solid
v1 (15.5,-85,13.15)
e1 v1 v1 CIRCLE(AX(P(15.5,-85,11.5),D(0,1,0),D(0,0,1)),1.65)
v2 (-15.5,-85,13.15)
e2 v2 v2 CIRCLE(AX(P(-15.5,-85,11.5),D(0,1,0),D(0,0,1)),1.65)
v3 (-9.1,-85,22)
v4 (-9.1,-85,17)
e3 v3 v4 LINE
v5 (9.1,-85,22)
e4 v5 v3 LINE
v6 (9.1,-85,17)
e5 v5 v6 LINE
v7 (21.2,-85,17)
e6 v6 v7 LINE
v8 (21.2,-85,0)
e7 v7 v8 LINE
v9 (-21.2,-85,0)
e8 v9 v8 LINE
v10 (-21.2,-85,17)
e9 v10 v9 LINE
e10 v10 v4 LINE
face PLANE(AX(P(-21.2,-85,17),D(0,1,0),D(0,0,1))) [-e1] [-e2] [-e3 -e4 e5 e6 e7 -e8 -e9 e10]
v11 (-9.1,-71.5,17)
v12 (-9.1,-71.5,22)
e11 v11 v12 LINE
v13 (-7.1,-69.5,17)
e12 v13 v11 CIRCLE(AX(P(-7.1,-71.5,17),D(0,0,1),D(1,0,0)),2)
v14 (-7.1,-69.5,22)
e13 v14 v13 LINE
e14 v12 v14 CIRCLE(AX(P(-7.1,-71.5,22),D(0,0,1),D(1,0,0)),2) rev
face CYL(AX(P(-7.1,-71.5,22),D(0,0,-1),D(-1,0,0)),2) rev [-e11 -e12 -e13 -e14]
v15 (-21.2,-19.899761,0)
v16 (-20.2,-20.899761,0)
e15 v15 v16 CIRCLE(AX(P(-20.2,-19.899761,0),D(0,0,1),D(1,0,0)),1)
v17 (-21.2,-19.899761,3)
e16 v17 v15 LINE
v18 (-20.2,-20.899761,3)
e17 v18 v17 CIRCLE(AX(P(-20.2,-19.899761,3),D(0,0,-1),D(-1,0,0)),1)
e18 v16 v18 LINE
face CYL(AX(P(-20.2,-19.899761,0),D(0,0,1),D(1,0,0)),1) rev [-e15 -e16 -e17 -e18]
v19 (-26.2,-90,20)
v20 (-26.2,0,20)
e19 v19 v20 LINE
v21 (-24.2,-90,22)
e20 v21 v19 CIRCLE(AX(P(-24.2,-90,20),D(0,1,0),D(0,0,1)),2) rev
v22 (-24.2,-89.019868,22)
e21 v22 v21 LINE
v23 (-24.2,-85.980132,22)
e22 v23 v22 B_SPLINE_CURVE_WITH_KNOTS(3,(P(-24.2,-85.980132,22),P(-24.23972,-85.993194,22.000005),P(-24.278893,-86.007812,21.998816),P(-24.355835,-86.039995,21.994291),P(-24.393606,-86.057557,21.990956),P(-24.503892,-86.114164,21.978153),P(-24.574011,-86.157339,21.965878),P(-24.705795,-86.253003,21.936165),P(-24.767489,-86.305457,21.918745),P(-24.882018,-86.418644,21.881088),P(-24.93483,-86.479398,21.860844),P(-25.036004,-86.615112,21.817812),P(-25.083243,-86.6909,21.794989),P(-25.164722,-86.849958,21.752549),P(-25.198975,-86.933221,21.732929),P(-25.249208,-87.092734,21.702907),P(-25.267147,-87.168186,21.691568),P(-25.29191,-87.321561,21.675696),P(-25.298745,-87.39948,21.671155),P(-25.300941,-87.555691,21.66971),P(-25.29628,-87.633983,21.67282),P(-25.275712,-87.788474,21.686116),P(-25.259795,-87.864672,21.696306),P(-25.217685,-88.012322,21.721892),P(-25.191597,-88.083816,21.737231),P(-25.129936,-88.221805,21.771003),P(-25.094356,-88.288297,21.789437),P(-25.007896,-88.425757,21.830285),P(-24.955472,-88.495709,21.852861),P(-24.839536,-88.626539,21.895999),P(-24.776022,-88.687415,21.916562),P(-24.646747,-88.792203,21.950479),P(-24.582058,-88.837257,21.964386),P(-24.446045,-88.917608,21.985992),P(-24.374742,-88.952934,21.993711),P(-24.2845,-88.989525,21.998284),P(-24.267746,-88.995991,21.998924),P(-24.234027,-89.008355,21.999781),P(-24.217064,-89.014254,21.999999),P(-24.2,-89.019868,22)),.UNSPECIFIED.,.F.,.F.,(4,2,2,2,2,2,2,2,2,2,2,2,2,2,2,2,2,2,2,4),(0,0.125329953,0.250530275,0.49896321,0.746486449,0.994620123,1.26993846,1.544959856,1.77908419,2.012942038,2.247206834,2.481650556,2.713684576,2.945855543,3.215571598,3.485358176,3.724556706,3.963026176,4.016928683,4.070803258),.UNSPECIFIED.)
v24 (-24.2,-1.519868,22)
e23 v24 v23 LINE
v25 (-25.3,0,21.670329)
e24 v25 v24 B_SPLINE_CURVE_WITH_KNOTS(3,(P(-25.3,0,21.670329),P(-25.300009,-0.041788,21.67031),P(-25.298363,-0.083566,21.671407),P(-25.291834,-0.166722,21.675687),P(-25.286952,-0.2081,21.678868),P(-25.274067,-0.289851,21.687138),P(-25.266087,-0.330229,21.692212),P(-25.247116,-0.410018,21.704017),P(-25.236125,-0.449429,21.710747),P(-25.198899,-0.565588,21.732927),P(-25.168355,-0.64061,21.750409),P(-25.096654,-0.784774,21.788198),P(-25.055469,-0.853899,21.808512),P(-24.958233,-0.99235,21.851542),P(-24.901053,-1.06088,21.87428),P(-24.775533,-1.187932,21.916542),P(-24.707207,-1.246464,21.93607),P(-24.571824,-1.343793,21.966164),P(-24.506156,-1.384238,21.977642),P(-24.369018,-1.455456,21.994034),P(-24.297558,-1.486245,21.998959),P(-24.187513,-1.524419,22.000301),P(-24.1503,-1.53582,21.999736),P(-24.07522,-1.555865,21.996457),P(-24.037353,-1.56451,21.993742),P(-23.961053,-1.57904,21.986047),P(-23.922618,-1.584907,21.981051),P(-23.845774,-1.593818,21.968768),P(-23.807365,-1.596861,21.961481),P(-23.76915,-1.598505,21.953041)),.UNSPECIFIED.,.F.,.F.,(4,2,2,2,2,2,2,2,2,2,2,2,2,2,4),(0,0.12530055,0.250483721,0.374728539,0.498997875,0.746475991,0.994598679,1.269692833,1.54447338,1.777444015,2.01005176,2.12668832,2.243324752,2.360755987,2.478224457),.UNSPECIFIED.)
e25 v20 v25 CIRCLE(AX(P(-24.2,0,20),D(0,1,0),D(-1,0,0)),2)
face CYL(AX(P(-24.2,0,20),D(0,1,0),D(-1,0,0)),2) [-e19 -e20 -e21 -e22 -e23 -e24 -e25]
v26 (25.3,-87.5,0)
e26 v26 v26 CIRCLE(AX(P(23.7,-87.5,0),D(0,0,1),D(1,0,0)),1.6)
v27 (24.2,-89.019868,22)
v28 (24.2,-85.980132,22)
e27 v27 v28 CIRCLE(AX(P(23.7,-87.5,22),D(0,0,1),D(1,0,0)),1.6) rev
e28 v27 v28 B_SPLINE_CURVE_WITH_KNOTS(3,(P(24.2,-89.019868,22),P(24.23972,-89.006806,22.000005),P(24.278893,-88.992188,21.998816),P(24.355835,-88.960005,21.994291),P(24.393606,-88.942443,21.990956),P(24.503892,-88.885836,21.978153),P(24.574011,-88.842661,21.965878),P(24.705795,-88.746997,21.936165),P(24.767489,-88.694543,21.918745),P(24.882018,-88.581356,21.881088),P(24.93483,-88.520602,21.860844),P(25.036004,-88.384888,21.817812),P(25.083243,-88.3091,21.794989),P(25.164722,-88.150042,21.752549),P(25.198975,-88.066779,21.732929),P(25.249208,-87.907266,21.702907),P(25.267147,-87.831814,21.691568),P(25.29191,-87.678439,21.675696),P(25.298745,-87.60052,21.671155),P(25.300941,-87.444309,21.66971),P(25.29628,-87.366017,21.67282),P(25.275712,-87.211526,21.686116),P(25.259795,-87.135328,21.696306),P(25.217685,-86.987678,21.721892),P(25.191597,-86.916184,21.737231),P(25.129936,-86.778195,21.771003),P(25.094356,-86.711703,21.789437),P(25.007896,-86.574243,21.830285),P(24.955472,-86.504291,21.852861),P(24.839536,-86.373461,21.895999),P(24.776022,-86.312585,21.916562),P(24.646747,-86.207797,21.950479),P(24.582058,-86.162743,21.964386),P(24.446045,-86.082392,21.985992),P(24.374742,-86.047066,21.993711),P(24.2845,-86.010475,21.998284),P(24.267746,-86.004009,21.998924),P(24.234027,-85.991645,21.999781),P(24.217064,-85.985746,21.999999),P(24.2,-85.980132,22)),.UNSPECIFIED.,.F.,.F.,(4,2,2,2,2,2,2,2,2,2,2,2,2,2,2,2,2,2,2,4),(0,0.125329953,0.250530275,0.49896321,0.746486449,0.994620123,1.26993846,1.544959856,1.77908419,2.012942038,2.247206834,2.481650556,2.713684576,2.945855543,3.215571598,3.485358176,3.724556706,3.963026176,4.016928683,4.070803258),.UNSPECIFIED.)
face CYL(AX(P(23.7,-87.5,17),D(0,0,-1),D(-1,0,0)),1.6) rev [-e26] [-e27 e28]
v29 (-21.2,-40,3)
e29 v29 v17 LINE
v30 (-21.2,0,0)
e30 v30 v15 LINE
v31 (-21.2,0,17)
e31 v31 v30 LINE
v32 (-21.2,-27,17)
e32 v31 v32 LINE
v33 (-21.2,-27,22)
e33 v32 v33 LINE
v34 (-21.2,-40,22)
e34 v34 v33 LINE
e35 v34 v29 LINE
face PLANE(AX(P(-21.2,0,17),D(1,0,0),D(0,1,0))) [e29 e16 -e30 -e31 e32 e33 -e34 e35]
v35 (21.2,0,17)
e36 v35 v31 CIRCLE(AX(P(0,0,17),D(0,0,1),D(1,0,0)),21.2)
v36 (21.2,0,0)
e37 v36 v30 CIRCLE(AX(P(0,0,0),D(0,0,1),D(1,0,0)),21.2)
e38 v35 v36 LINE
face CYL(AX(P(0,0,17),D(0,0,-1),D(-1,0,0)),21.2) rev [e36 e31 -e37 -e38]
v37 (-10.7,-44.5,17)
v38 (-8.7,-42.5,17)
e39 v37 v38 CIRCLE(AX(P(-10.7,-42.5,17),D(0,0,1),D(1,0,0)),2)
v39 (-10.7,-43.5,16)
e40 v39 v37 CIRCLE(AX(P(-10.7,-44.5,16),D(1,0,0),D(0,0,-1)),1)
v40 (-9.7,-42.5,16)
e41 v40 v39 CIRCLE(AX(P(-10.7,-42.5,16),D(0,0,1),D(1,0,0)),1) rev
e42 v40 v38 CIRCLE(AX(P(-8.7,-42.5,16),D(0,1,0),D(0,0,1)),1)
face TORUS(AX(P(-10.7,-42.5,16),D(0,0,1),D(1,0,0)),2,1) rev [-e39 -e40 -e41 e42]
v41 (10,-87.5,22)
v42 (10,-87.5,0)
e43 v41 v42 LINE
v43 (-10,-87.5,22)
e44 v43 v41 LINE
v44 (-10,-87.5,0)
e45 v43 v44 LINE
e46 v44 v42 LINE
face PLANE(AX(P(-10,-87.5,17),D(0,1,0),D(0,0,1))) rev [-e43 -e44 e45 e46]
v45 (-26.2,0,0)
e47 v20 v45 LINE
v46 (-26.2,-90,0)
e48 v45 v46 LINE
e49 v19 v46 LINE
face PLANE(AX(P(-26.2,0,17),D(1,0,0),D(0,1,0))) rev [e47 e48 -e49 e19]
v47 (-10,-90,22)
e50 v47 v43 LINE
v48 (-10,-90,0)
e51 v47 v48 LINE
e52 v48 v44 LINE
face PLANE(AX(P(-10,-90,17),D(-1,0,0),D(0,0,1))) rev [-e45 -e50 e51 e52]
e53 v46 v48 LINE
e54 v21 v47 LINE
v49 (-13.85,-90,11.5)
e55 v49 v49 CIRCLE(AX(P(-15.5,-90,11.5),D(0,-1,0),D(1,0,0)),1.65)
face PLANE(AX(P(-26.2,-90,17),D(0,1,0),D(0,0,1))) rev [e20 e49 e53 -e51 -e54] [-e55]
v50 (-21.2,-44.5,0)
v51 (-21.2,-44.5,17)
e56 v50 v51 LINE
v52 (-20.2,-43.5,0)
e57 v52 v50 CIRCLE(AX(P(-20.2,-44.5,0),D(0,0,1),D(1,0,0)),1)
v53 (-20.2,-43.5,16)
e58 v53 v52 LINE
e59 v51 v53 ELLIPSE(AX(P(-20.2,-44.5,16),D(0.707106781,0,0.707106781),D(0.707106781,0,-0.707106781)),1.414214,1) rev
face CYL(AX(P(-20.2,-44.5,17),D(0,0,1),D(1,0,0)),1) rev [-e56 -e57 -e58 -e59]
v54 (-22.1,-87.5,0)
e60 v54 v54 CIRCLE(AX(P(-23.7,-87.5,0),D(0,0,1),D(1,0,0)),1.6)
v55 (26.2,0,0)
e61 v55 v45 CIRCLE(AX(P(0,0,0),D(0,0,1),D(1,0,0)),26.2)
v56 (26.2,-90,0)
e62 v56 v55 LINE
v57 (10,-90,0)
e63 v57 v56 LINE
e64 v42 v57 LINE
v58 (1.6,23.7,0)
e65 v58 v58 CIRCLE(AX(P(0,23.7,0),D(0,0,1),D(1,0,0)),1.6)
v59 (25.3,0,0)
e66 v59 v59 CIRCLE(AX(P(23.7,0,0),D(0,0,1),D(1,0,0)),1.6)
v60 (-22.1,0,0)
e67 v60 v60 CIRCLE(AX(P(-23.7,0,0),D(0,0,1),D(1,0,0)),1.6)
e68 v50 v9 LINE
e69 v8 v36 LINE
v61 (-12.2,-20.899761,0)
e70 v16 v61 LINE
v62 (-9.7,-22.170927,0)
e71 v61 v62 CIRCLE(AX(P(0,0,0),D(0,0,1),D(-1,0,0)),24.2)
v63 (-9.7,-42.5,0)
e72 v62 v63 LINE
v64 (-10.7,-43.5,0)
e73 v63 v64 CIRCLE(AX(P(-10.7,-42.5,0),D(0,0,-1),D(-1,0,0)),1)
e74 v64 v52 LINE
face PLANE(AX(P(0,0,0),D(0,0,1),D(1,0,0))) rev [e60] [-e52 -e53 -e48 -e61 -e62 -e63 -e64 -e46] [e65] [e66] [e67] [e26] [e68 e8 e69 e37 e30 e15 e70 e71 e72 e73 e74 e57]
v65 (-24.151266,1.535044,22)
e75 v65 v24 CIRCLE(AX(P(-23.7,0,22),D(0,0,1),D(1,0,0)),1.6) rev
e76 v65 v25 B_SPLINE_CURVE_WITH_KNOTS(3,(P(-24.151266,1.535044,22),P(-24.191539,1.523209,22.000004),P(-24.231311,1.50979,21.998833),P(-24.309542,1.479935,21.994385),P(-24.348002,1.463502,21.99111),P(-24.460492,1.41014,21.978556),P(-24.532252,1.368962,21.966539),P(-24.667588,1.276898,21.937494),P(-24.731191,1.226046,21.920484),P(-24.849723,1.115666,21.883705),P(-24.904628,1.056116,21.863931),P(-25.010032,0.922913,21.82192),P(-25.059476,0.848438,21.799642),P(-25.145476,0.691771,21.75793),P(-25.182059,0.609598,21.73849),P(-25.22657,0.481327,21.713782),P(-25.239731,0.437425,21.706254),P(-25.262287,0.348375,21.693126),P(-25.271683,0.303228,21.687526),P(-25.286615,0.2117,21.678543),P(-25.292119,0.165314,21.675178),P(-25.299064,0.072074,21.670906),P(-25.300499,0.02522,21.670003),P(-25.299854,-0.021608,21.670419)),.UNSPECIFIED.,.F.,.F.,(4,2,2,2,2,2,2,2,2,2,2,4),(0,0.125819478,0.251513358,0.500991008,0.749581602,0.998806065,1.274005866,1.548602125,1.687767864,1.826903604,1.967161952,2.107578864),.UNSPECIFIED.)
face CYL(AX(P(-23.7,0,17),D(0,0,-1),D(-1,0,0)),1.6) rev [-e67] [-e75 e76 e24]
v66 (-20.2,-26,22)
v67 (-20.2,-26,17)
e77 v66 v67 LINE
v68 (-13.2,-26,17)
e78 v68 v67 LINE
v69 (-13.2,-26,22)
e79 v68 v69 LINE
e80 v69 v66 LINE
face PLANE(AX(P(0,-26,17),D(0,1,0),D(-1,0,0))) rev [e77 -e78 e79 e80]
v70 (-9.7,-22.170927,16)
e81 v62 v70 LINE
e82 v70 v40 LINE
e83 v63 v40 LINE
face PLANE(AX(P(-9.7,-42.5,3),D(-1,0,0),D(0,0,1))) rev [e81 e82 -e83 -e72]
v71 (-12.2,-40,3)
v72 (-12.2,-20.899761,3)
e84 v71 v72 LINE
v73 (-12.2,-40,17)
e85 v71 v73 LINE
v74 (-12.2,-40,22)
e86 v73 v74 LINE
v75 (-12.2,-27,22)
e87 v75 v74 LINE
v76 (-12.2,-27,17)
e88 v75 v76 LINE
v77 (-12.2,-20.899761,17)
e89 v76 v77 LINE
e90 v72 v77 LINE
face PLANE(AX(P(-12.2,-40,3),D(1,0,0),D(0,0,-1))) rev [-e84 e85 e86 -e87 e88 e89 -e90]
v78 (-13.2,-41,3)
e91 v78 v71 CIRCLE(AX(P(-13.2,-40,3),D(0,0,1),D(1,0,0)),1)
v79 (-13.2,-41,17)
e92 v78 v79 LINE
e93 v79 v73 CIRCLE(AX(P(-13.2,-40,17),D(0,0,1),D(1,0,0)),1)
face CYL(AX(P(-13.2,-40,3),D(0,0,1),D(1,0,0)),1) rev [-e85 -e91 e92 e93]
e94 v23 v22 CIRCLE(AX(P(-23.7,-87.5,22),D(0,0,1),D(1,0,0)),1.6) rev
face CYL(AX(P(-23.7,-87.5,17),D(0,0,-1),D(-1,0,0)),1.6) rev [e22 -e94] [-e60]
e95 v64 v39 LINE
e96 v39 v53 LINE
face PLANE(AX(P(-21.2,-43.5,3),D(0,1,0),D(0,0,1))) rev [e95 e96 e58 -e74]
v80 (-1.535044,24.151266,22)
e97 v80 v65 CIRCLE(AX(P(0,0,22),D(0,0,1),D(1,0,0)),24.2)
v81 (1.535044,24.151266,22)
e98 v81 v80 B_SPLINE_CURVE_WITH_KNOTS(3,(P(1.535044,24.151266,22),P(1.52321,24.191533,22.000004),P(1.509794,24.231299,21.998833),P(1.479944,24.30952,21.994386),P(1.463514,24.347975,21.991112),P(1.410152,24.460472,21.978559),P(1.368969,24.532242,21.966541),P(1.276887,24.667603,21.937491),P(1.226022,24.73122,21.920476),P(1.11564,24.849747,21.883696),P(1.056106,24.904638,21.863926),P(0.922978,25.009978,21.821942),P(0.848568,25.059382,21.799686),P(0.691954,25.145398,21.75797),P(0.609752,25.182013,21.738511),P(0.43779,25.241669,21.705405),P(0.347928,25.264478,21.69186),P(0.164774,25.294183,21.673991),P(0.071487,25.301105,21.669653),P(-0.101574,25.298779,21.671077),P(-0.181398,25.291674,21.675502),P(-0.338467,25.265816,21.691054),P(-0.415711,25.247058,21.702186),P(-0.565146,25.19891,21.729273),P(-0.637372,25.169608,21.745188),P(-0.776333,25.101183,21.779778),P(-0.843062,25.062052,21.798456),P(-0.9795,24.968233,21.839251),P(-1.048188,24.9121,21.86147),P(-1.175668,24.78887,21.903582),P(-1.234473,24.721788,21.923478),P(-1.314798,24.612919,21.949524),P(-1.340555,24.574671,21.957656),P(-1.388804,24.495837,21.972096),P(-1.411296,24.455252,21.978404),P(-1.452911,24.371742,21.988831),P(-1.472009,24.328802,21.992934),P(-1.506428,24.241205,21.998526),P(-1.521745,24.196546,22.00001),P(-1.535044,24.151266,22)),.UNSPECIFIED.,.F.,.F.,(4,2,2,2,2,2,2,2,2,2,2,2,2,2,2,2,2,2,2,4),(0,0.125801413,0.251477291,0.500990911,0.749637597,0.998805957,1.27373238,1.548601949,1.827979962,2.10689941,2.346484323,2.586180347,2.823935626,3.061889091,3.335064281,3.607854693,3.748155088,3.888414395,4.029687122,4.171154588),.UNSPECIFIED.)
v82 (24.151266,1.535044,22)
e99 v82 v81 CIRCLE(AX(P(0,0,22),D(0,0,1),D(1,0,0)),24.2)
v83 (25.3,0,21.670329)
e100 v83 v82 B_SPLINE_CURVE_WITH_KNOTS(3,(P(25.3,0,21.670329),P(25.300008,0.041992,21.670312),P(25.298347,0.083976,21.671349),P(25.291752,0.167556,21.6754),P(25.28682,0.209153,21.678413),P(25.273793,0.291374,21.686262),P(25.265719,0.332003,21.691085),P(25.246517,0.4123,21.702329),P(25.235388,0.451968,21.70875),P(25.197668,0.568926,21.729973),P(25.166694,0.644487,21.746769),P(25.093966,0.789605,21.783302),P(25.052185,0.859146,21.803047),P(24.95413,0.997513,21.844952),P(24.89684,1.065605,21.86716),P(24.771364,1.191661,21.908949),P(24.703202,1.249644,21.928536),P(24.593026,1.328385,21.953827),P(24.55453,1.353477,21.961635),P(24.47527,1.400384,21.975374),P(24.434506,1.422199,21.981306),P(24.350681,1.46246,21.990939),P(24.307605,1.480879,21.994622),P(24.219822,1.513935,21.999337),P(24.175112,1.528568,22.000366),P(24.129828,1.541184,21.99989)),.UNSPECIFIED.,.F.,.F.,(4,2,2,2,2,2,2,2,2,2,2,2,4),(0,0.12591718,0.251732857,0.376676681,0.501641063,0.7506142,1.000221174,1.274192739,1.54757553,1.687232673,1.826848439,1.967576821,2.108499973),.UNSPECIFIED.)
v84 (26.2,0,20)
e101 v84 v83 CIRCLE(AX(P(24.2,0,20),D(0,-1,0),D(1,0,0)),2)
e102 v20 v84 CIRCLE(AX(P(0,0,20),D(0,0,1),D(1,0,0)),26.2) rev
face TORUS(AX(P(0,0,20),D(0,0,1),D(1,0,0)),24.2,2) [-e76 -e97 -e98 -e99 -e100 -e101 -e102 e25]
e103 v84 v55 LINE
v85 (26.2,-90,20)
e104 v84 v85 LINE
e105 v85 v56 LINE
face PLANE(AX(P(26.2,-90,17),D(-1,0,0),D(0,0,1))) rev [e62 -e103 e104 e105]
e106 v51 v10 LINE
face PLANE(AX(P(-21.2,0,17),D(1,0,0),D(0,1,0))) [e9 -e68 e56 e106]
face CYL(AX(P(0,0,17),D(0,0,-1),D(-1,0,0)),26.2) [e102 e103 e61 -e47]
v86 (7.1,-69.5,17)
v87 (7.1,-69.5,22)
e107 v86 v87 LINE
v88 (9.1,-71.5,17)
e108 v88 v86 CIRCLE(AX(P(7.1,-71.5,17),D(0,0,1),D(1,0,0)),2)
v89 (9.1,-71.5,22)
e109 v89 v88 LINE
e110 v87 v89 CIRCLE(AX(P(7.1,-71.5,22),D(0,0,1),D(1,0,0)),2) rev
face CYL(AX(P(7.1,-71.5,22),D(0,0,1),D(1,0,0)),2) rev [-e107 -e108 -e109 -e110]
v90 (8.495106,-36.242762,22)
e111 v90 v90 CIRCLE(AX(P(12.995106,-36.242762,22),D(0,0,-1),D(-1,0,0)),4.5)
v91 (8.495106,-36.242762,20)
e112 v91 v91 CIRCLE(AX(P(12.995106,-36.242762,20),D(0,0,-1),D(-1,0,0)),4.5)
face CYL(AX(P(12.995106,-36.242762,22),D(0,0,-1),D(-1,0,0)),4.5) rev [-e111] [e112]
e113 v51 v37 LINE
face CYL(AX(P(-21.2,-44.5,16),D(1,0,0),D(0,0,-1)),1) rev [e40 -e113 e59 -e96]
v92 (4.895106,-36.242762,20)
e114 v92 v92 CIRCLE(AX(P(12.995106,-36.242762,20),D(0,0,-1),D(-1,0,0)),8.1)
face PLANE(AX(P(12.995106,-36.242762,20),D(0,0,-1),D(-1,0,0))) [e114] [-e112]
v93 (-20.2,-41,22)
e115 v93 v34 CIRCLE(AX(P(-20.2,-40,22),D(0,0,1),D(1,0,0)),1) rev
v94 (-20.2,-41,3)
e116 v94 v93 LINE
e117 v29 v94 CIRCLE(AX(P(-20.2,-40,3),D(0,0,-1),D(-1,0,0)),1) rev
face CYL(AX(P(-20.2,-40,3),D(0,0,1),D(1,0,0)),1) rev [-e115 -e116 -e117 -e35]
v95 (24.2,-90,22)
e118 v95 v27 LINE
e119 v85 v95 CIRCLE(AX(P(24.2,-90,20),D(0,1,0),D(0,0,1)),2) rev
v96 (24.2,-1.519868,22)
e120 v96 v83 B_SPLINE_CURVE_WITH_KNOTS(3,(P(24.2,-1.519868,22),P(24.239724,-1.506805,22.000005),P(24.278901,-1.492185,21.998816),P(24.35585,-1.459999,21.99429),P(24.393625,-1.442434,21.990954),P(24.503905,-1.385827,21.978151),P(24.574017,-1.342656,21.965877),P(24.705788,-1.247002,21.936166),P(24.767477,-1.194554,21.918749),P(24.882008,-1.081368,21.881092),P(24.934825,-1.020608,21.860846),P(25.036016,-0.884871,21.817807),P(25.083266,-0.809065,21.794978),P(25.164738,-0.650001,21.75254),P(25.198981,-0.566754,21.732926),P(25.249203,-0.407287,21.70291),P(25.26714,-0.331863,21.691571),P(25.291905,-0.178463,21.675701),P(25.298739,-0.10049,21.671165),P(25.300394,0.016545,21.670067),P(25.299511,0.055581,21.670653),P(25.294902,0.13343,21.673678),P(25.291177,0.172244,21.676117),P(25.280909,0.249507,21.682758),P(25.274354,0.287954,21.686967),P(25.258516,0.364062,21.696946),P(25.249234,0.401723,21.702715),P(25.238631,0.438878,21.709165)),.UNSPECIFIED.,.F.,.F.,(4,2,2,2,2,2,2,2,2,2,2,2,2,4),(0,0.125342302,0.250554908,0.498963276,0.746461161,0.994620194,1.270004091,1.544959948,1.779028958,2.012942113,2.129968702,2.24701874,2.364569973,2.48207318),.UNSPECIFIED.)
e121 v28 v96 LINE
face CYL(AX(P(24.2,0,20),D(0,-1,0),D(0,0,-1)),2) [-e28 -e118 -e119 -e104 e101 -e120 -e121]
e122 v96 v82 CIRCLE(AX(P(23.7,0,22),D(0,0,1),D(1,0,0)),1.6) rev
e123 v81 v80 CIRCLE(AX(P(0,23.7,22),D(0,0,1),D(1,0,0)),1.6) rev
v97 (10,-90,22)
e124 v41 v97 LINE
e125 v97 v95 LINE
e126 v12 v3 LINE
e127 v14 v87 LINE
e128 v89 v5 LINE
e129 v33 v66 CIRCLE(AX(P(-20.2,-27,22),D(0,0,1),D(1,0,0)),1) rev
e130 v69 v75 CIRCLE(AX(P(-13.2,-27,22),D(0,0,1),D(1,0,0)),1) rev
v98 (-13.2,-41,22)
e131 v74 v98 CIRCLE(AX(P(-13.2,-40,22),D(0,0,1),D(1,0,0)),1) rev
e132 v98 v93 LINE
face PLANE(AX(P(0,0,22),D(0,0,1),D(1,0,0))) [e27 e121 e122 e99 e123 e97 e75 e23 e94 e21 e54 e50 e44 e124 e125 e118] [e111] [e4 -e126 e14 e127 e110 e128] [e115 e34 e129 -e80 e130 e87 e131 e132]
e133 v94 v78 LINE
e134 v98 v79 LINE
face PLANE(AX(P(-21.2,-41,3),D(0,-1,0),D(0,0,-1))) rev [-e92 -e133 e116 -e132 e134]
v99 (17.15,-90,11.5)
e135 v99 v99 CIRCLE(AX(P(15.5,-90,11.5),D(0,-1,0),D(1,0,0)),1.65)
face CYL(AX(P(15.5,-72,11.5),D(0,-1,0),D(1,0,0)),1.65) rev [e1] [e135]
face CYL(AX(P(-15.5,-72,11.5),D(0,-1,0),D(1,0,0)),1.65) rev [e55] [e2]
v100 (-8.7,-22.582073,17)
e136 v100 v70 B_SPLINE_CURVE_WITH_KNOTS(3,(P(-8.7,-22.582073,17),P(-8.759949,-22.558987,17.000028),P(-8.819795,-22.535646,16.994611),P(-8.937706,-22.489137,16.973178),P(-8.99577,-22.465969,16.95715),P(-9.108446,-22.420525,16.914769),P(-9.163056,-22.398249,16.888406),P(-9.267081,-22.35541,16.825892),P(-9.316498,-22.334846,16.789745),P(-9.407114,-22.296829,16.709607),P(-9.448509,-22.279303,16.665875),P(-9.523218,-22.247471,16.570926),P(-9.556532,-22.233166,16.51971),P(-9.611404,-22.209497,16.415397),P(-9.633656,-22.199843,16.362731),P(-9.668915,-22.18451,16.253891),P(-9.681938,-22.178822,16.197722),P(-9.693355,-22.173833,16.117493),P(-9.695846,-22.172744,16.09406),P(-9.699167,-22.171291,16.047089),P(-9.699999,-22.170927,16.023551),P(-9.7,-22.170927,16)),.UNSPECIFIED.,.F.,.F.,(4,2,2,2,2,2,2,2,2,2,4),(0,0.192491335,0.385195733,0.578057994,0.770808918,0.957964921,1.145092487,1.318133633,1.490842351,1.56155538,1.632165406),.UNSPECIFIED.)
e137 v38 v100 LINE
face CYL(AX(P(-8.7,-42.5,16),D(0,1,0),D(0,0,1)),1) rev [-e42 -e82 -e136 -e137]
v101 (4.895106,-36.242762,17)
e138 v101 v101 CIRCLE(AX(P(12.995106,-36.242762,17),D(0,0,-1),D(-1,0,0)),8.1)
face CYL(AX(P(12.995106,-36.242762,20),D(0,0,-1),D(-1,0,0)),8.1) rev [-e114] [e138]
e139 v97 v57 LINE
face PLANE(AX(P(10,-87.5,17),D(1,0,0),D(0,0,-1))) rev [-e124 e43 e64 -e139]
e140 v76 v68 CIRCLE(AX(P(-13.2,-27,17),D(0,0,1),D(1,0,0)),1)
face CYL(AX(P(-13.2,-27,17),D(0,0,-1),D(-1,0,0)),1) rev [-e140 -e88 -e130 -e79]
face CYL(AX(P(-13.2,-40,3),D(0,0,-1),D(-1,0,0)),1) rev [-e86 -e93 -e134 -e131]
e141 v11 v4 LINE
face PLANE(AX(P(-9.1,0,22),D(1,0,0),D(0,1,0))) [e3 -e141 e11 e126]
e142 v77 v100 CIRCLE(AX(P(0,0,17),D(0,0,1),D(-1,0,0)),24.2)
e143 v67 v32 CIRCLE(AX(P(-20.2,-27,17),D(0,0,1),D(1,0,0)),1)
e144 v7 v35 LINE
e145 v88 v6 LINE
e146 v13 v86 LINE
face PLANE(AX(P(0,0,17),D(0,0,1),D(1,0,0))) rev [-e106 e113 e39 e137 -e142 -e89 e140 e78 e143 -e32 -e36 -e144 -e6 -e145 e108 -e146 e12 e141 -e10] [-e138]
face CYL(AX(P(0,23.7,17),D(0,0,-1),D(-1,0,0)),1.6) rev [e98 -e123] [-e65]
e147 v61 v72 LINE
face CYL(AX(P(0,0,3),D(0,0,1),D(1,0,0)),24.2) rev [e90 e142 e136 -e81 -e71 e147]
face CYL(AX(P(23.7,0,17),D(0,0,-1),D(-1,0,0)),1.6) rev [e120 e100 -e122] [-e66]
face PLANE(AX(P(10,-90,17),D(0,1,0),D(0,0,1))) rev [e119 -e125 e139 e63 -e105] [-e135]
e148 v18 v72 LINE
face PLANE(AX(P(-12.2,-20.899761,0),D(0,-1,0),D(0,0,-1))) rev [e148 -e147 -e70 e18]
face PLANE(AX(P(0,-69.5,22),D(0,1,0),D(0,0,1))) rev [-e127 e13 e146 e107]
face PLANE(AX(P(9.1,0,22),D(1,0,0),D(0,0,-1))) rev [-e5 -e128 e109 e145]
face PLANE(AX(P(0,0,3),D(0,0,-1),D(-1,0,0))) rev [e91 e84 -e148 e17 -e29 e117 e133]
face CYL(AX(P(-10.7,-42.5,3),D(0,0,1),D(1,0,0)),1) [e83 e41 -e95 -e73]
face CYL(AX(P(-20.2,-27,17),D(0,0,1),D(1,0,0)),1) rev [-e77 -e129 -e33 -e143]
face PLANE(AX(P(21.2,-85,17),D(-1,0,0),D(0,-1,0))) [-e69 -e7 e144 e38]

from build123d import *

# Parameters (mm, degrees)
SKETCH1_R               = 1.6
BOSS_EXTRUDE1_DEPTH     = 17
SKETCH2_R               = 1.65
CUT_EXTRUDE1_DEPTH      = 18
BOSS_EXTRUDE2_OUTLINE_R = 1.6
BOSS_EXTRUDE2_OUTLINE_W = 18.2
BOSS_EXTRUDE2_OUTLINE_H = 15.5
BOSS_EXTRUDE2_DEPTH     = 5
SKETCH5_R               = 8.1
CUT_EXTRUDE2_DEPTH      = 3
SKETCH6_R               = 4.5
CUT_EXTRUDE3_DEPTH      = 96.845918014
BOSS_EXTRUDE4_DEPTH     = 14
BOSS_EXTRUDE5_DEPTH     = 3
FILLET1_R               = 2
SKETCH10_W              = 9
SKETCH10_H              = 15
CUT_EXTRUDE4_DEPTH      = 5
FILLET2_R               = 1
FILLET3_R               = 1
FILLET4_R               = 2


# Read off the part's stored shape, not the designer's step: Boss-Extrude2
with BuildPart() as part:
    # Sketch1 → Boss-Extrude1 (new body)
    with BuildSketch(Plane.XY):
        with BuildLine():
            Line((10, -87.5), (10, -90))
            Line((10, -90), (26.2, -90))
            Line((26.2, -90), (26.2, 0))
            ThreePointArc((26.2, 0), (0, 26.2), (-26.2, 0))
            Line((-26.2, 0), (-26.2, -90))
            Line((-26.2, -90), (-10, -90))
            Line((-10, -90), (-10, -87.5))
            Line((-10, -87.5), (10, -87.5))
        make_face()
        with Locations((-23.7, -87.5)):
            Circle(SKETCH1_R, mode=Mode.SUBTRACT)
        with Locations((23.7, -87.5)):
            Circle(SKETCH1_R, mode=Mode.SUBTRACT)
        with Locations((-23.7, 0)):
            Circle(SKETCH1_R, mode=Mode.SUBTRACT)
        with Locations((0, 23.7)):
            Circle(SKETCH1_R, mode=Mode.SUBTRACT)
        with Locations((23.7, 0)):
            Circle(SKETCH1_R, mode=Mode.SUBTRACT)
        with BuildLine():
            Line((-21.2, -85), (21.2, -85))
            Line((21.2, -85), (21.2, 0))
            ThreePointArc((21.2, 0), (0, 21.2), (-21.2, 0))
            Line((-21.2, 0), (-21.2, -85))
        make_face(mode=Mode.SUBTRACT)
    extrude(amount=BOSS_EXTRUDE1_DEPTH)

    # Sketch2 → Cut-Extrude1 (cut)
    with BuildSketch(Plane.XZ.offset(90)):
        with Locations((15.5, 11.5)):
            Circle(SKETCH2_R)
        with Locations((-15.5, 11.5)):
            Circle(SKETCH2_R)
    extrude(amount=-CUT_EXTRUDE1_DEPTH, mode=Mode.SUBTRACT)

    # Boss-Extrude2 outline → Boss-Extrude2 (add)
    with BuildSketch(Plane.XY.offset(17)):
        with BuildLine():
            Line((-10, -87.5), (10, -87.5))
            Line((10, -87.5), (10, -90))
            Line((10, -90), (26.2, -90))
            Line((26.2, -90), (26.2, 0))
            ThreePointArc((26.2, 0), (0, 26.2), (-26.2, 0))
            Line((-26.2, 0), (-26.2, -90))
            Line((-26.2, -90), (-10, -90))
            Line((-10, -90), (-10, -87.5))
        make_face()
        with Locations((-23.7, -87.5)):
            Circle(BOSS_EXTRUDE2_OUTLINE_R, mode=Mode.SUBTRACT)
        with Locations((0, -77.25)):
            Rectangle(BOSS_EXTRUDE2_OUTLINE_W, BOSS_EXTRUDE2_OUTLINE_H, mode=Mode.SUBTRACT)
        with Locations((23.7, -87.5)):
            Circle(BOSS_EXTRUDE2_OUTLINE_R, mode=Mode.SUBTRACT)
        with Locations((-23.7, 0)):
            Circle(BOSS_EXTRUDE2_OUTLINE_R, mode=Mode.SUBTRACT)
        with Locations((0, 23.7)):
            Circle(BOSS_EXTRUDE2_OUTLINE_R, mode=Mode.SUBTRACT)
        with Locations((23.7, 0)):
            Circle(BOSS_EXTRUDE2_OUTLINE_R, mode=Mode.SUBTRACT)
    extrude(amount=BOSS_EXTRUDE2_DEPTH)

    # Sketch5 → Cut-Extrude2 (cut)
    with BuildSketch(Plane(origin=(0, 0, 17), x_dir=(-1, 0, 0), z_dir=(0, 0, -1))):
        with Locations((-12.995105527, -36.242762456)):
            Circle(SKETCH5_R)
    extrude(amount=-CUT_EXTRUDE2_DEPTH, mode=Mode.SUBTRACT)

    # Sketch6 → Cut-Extrude3 (cut, through all)
    with BuildSketch(Plane(origin=(0, 0, 20), x_dir=(-1, 0, 0), z_dir=(0, 0, -1))):
        with Locations((-12.995105527, -36.242762456)):
            Circle(SKETCH6_R)
    extrude(amount=-CUT_EXTRUDE3_DEPTH, mode=Mode.SUBTRACT)

    # Sketch7 → Boss-Extrude4 (add)
    with BuildSketch(Plane(origin=(0, 0, 17), x_dir=(-1, 0, 0), z_dir=(0, 0, -1))):
        with BuildLine():
            Line((21.2, -41), (13.2, -41))
            ThreePointArc((13.2, -41), (12.492893219, -40.707106781), (12.2, -40))
            Line((12.2, -40), (12.2, -20.899760764))
            ThreePointArc((12.2, -20.899760764), (10.968430418, -21.571590905), (9.7, -22.170926909))
            Line((9.7, -22.170926909), (9.7, -22.383029286))
            Line((9.7, -22.383029286), (9.7, -42.5))
            ThreePointArc((9.7, -42.5), (9.992893219, -43.207106781), (10.7, -43.5))
            Line((10.7, -43.5), (21.2, -43.5))
            Line((21.2, -43.5), (21.2, -41))
        make_face()
    extrude(amount=BOSS_EXTRUDE4_DEPTH)

    # Sketch8 → Boss-Extrude5 (add)
    with BuildSketch(Plane(origin=(0, 0, 3), x_dir=(-1, 0, 0), z_dir=(0, 0, -1))):
        with BuildLine():
            Line((12.2, -20.899760764), (21.2, -20.899760764))
            Line((21.2, -20.899760764), (21.2, -41))
            Line((21.2, -41), (21.2, -43.5))
            Line((21.2, -43.5), (10.7, -43.5))
            ThreePointArc((10.7, -43.5), (9.992893219, -43.207106781), (9.7, -42.5))
            Line((9.7, -42.5), (9.7, -22.170926909))
            ThreePointArc((9.7, -22.170926909), (10.968430418, -21.571590905), (12.2, -20.899760764))
        make_face()
    extrude(amount=BOSS_EXTRUDE5_DEPTH)

    # Fillet1
    # the kernel refuses this fillet: 2 mm, written as the material it takes off along each edge
    with BuildSketch(Plane(origin=(26.2, -95, 22), x_dir=(0, 0, -1), z_dir=(0, 1, 0)), Plane(origin=(-26.2, 0, 22), x_dir=(0, 0, -1), z_dir=(0, -1, 0))) as fillet1_piece_1:
        with BuildLine():
            CenterArc((FILLET1_R, FILLET1_R), FILLET1_R, 180, 90)
            Line((0, FILLET1_R), (0, 0))
            Line((0, 0), (FILLET1_R, 0))
        make_face()
    extrude(amount=95, mode=Mode.SUBTRACT)
    with BuildSketch(Plane(origin=(0, 0, 22), x_dir=(1, 0, 0), z_dir=(0, -1, 0))) as fillet1_piece_2:
        with BuildLine():
            CenterArc((26.2 - FILLET1_R, -FILLET1_R), FILLET1_R, 0, 90)
            Line((26.2, -FILLET1_R), (26.2, 0))
            Line((26.2, 0), (26.2 - FILLET1_R, 0))
        make_face()
    revolve(axis=Axis((0, 0, 22), (0, 0, 1)), revolution_arc=180, mode=Mode.SUBTRACT)

    # Sketch10 → Cut-Extrude4 (cut)
    with BuildSketch(Plane.XY.offset(22)):
        with Locations((-16.7, -33.5)):
            Rectangle(SKETCH10_W, SKETCH10_H)
    extrude(amount=-CUT_EXTRUDE4_DEPTH, mode=Mode.SUBTRACT)

    # Fillet2
    fillet2_edges = [part.edges().sort_by_distance(p)[0] for p in [
        (-21.2, -41, 12.5),
        (-12.2, -26, 19.5),
        (-21.2, -26, 19.5),
        (-12.2, -41, 19.5),
    ]]
    fillet(fillet2_edges, radius=FILLET2_R)

    # Fillet3
    fillet3_edges = [part.edges().sort_by_distance(p)[0] for p in [
        (-21.2, -43.5, 8.5),
        (-9.7, -32.335463454, 17),
        (-9.992893219, -43.207106781, 17),
        (-15.95, -43.5, 17),
        (-21.2, -20.899760764, 1.5),
    ]]
    fillet(fillet3_edges, radius=FILLET3_R)

    # Fillet4
    fillet4_edges = [part.edges().sort_by_distance(p)[0] for p in [
        (9.1, -69.5, 19.5),
        (-9.1, -69.5, 19.5),
    ]]
    fillet(fillet4_edges, radius=FILLET4_R)


solid = part.part
